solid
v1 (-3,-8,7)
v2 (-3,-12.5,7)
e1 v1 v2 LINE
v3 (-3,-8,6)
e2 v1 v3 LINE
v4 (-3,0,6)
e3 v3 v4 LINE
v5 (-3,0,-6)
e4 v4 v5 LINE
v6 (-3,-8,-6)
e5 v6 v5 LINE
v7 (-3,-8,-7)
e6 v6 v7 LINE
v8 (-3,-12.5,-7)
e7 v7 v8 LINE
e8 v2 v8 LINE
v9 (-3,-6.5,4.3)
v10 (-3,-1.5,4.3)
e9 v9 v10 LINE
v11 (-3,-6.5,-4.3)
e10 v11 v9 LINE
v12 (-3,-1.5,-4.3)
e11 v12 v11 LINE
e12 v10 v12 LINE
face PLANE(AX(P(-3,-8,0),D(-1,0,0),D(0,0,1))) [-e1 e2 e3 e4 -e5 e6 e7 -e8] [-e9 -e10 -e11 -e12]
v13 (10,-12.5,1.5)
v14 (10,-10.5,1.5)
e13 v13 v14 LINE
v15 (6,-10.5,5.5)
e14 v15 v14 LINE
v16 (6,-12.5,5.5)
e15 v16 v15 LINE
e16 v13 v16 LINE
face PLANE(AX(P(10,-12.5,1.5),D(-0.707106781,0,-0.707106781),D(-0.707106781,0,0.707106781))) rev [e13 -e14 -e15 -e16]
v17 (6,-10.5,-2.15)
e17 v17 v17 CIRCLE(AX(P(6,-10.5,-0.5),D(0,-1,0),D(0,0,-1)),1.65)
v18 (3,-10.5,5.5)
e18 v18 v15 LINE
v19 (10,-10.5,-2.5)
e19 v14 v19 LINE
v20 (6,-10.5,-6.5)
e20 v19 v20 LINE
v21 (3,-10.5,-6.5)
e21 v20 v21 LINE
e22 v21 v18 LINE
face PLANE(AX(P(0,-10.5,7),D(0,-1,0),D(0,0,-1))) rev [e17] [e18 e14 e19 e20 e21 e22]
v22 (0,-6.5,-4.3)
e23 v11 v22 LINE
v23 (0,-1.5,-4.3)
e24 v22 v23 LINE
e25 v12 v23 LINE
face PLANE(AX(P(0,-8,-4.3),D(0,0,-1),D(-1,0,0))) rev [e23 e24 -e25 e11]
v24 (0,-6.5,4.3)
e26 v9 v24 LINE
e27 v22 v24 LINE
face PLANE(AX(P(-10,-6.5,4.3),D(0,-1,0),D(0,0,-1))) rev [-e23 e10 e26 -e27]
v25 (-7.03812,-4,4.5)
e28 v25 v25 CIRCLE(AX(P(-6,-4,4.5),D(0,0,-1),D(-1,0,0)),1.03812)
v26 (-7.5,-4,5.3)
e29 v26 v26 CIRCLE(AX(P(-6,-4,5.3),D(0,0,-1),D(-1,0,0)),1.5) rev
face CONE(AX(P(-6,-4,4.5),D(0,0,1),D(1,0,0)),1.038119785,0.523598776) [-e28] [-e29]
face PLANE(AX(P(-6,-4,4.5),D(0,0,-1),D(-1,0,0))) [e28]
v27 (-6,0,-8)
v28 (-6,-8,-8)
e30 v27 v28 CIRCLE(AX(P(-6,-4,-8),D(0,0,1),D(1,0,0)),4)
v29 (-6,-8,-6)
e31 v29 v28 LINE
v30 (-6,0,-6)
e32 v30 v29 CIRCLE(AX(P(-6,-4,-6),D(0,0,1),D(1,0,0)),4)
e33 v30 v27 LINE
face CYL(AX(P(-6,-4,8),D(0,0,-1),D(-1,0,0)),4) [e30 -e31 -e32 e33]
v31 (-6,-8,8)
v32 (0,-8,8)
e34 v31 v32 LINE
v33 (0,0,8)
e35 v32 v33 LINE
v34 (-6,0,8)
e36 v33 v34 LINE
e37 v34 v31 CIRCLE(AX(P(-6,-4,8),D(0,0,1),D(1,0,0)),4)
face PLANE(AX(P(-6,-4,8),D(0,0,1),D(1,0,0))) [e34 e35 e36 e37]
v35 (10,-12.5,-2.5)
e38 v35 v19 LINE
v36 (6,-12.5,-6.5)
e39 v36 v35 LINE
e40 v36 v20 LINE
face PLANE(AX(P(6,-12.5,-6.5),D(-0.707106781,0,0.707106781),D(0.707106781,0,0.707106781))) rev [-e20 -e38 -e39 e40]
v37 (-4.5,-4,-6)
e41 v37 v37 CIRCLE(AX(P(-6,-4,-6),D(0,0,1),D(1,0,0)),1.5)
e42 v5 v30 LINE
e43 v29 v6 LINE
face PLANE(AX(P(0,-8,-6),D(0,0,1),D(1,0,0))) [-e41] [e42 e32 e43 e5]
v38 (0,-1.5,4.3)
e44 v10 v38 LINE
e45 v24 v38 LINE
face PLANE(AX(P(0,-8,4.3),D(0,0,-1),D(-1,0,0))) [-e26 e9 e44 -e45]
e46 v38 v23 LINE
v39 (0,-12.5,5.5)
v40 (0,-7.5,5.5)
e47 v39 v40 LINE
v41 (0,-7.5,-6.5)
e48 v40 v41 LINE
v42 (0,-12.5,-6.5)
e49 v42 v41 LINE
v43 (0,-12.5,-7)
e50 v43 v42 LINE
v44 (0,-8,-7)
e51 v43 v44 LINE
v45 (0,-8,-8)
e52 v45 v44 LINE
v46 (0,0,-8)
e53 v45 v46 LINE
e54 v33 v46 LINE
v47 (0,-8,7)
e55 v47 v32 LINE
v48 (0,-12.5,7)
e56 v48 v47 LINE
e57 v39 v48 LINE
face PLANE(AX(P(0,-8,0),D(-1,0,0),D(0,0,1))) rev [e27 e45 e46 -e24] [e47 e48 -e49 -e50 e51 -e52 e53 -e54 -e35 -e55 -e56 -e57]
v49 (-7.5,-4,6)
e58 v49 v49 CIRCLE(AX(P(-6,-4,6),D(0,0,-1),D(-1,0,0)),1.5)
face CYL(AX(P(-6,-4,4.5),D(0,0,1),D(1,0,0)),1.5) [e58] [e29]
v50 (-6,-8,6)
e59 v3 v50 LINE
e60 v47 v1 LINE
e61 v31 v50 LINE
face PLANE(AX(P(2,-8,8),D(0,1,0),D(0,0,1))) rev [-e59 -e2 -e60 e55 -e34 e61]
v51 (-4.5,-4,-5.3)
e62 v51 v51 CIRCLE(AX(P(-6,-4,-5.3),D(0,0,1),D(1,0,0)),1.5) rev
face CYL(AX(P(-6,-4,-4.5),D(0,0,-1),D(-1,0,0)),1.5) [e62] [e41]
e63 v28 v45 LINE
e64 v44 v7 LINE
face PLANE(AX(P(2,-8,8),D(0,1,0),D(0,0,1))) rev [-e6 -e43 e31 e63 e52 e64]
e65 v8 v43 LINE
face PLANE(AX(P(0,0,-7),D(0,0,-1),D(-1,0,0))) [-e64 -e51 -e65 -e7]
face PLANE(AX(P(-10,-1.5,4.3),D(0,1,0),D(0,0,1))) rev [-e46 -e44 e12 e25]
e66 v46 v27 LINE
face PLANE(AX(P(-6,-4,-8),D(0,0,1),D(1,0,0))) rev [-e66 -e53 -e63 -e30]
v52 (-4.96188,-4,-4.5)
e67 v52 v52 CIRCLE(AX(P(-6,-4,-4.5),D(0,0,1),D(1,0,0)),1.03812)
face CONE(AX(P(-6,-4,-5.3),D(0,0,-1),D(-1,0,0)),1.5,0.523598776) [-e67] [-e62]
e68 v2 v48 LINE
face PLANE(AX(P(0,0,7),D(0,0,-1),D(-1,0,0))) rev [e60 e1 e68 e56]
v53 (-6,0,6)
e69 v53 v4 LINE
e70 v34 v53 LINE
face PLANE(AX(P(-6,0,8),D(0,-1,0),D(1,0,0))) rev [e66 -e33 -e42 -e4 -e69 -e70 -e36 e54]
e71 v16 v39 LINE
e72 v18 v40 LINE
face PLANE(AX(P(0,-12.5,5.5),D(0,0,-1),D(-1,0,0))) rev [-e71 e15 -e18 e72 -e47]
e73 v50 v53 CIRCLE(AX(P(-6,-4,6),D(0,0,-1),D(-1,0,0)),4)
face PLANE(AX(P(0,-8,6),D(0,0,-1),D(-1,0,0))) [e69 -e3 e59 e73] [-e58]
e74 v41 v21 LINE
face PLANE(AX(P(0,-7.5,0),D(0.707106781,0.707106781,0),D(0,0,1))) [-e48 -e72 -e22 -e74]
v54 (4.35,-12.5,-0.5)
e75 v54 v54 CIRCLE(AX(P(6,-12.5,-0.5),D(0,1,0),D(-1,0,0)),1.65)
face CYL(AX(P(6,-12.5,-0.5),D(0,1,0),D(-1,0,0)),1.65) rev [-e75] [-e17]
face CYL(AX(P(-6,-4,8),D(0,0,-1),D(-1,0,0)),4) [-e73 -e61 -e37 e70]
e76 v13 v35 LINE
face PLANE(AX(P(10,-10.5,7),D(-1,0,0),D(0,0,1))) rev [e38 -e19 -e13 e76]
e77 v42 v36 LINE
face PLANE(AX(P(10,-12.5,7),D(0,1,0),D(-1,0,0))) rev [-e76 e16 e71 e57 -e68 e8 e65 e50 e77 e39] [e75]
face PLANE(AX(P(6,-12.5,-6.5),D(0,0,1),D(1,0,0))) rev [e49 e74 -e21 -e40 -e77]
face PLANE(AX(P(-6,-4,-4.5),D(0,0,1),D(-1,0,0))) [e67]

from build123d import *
from OCP.BRepFilletAPI import BRepFilletAPI_MakeChamfer

# Parameters (mm, degrees)
RESSALTO_EXTRUS_O1_DEPTH    = 8
CORTE_EXTRUS_O1_START       = -8
CORTE_EXTRUS_O1_OUTLINE_W   = 7
CORTE_EXTRUS_O1_OUTLINE_H   = 12
CORTE_EXTRUS_O1_OUTLINE_W_2 = 6
CORTE_EXTRUS_O1_OUTLINE_H_2 = 8.6
CORTE_EXTRUS_O1_DEPTH       = 8
CORTE_EXTRUS_O2_DEPTH       = 16.099668871
CORTE_EXTRUS_O2_DEPTH_BACK  = 16.099668871
ESBO_O3_W                   = 8.6
ESBO_O3_H                   = 5
CORTE_EXTRUS_O3_DEPTH       = 18.756407294
CORTE_EXTRUS_O3_DEPTH_BACK  = 18.756407294
ESBO_O4_R                   = 1.65
ESBO_O5_R                   = 1.5
RESSALTO_EXTRUS_O2_DEPTH    = 1.5
FILETE1_R                   = 2
CHANFRO1_SIZE               = 0.8
CHANFRO1_SIZE2              = 0.461880215
ESBO_O7_W                   = 9.300626083
ESBO_O7_H                   = 16
CORTE_EXTRUS_O5_DEPTH       = 10
RESSALTO_EXTRUS_O4_DEPTH    = 7
ESBO_O10_R                  = 1.65
CORTE_EXTRUS_O6_DEPTH       = 18.895530168
CHANFRO2_SIZE               = 3


# Read off the part's stored shape, not the designer's step: Corte-extrusão1
with BuildPart() as part:
    # Esboço1 → Ressalto-extrusão1 (new, symmetric)
    with BuildSketch(Plane.XY):
        with BuildLine():
            Line((-6, 0), (6, 0))
            Line((6, 0), (6, -5.690598923))
            Line((6, -5.690598923), (2, -8))
            Line((2, -8), (-6, -8))
            ThreePointArc((-6, -8), (-10, -4), (-6, 0))
        make_face()
    extrude(amount=RESSALTO_EXTRUS_O1_DEPTH, both=True)

    # Corte-extrusão1 outline → Corte-extrusão1 (cut)
    with BuildSketch(Plane(origin=(0, 0, 0), x_dir=(1, 0, 0), z_dir=(0, 1, 0)).offset(CORTE_EXTRUS_O1_START)):
        with Locations((-6.5, 0)):
            Rectangle(CORTE_EXTRUS_O1_OUTLINE_W, CORTE_EXTRUS_O1_OUTLINE_H)
        with Locations((3, 0)):
            Rectangle(CORTE_EXTRUS_O1_OUTLINE_W_2, CORTE_EXTRUS_O1_OUTLINE_H_2)
    extrude(amount=CORTE_EXTRUS_O1_DEPTH, mode=Mode.SUBTRACT)

    # Esboço3 → Corte-extrusão2 (cut, two sides: drawn at the far end of the back side and taken through both)
    with BuildSketch(Plane(origin=(0, 0, 0), x_dir=(0, 0, -1), z_dir=(1, 0, 0)).offset(-CORTE_EXTRUS_O2_DEPTH_BACK)):
        with Locations((0, -4)):
            Rectangle(ESBO_O3_W, ESBO_O3_H)
    extrude(amount=CORTE_EXTRUS_O2_DEPTH + CORTE_EXTRUS_O2_DEPTH_BACK, mode=Mode.SUBTRACT)

    # Esboço4 → Corte-extrusão3 (cut, two sides: drawn at the far end of the back side and taken through both)
    with BuildSketch(Plane(origin=(0, 0, 4.3), x_dir=(-1, 0, 0), z_dir=(0, 0, -1)).offset(-CORTE_EXTRUS_O3_DEPTH_BACK)):
        with Locations((-3.2, -4)):
            Circle(ESBO_O4_R)
    extrude(amount=CORTE_EXTRUS_O3_DEPTH + CORTE_EXTRUS_O3_DEPTH_BACK, mode=Mode.SUBTRACT)

    # Esboço5 → Ressalto-extrusão2 (add)
    with BuildSketch(Plane(origin=(0, 0, 6), x_dir=(-1, 0, 0), z_dir=(0, 0, -1))):
        with Locations((6, -4)):
            Circle(ESBO_O5_R)
    ressalto_extrus_o2 = extrude(amount=RESSALTO_EXTRUS_O2_DEPTH)

    # Espelhar1: Ressalto-extrusão2 across plane
    add(ressalto_extrus_o2.mirror(Plane.XY))

    # Filete1
    filete1_edges = [part.edges().sort_by_distance(p)[0] for p in [
        (6, -5.690598923, -6.15),
        (6, -5.690598923, 6.15),
    ]]
    fillet(filete1_edges, radius=FILETE1_R)

    # Chanfro1: one chamfer whose edges measure the first distance from different faces: ONE call of the kernel's chamfer builder (chamfer() names one face for all edges)
    chanfro1_edges_1 = [part.edges().sort_by_distance(p)[0] for p in [
        (-4.5, -4, 4.5),
    ]]
    chanfro1_side_1 = [part.faces().sort_by_distance(p)[0] for p in [
        (-4.5, -4, 5.25),
    ]]
    chanfro1_edges_2 = [part.edges().sort_by_distance(p)[0] for p in [
        (-4.5, -4, -4.5),
    ]]
    chanfro1_side_2 = [part.faces().sort_by_distance(p)[0] for p in [
        (-4.5, -4, -5.25),
    ]]
    chanfro1_edges_3 = [part.edges().sort_by_distance(p)[0] for p in [
        (4.85, -4, -4.3),
    ]]
    chanfro1_side_3 = [part.faces().sort_by_distance(p)[0] for p in [
        (4.85, -4, -6.15),
    ]]
    chanfro1_edges_4 = [part.edges().sort_by_distance(p)[0] for p in [
        (4.85, -4, 4.3),
    ]]
    chanfro1_side_4 = [part.faces().sort_by_distance(p)[0] for p in [
        (4.85, -4, 6.15),
    ]]
    chanfro1 = BRepFilletAPI_MakeChamfer(part.part.solid().wrapped)
    for e in chanfro1_edges_1:
        chanfro1.Add(CHANFRO1_SIZE, CHANFRO1_SIZE2, e.wrapped, chanfro1_side_1[0].wrapped)  # the first distance lies on this face
    for e in chanfro1_edges_2:
        chanfro1.Add(CHANFRO1_SIZE, CHANFRO1_SIZE2, e.wrapped, chanfro1_side_2[0].wrapped)  # the first distance lies on this face
    for e in chanfro1_edges_3:
        chanfro1.Add(CHANFRO1_SIZE, CHANFRO1_SIZE2, e.wrapped, chanfro1_side_3[0].wrapped)  # the first distance lies on this face
    for e in chanfro1_edges_4:
        chanfro1.Add(CHANFRO1_SIZE, CHANFRO1_SIZE2, e.wrapped, chanfro1_side_4[0].wrapped)  # the first distance lies on this face
    add(Compound.cast(chanfro1.Shape()), mode=Mode.REPLACE)

    # Esboço7 → Corte-extrusão5 (cut)
    with BuildSketch(Plane(origin=(0, 0, 0), x_dir=(1, 0, 0), z_dir=(0, 1, 0))):
        with Locations((4.650313042, 0)):
            Rectangle(ESBO_O7_W, ESBO_O7_H)
    extrude(amount=-CORTE_EXTRUS_O5_DEPTH, mode=Mode.SUBTRACT)

    # Esboço9 → Ressalto-extrusão4 (add, symmetric)
    with BuildSketch(Plane.XY):
        Polygon((0, -8), (0, -10.5), (10, -10.5), (10, -12.5), (-3, -12.5), (-3, -8), align=None)
    extrude(amount=RESSALTO_EXTRUS_O4_DEPTH, both=True)

    # Esboço10 → Corte-extrusão6 (cut, through all)
    with BuildSketch(Plane(origin=(0, 0, 0), x_dir=(1, 0, 0), z_dir=(0, 1, 0))):
        with Locations(Location((6, 0.5, 0), (0, 0, 180))):
            Circle(ESBO_O10_R)
        Polygon((6, 6.5), (10, 2.5), (10, 8), (5.06809326, 8), (0, 8), (0, 6.5), align=None)
        Polygon((10, -1.5), (6, -5.5), (0, -5.5), (0, -8), (10, -8), align=None)
    extrude(amount=-CORTE_EXTRUS_O6_DEPTH, mode=Mode.SUBTRACT)

    # Chanfro2
    chanfro2_edges = [part.edges().sort_by_distance(p)[0] for p in [
        (0, -10.5, -0.5),
    ]]
    chamfer(chanfro2_edges, length=CHANFRO2_SIZE)


solid = part.part
